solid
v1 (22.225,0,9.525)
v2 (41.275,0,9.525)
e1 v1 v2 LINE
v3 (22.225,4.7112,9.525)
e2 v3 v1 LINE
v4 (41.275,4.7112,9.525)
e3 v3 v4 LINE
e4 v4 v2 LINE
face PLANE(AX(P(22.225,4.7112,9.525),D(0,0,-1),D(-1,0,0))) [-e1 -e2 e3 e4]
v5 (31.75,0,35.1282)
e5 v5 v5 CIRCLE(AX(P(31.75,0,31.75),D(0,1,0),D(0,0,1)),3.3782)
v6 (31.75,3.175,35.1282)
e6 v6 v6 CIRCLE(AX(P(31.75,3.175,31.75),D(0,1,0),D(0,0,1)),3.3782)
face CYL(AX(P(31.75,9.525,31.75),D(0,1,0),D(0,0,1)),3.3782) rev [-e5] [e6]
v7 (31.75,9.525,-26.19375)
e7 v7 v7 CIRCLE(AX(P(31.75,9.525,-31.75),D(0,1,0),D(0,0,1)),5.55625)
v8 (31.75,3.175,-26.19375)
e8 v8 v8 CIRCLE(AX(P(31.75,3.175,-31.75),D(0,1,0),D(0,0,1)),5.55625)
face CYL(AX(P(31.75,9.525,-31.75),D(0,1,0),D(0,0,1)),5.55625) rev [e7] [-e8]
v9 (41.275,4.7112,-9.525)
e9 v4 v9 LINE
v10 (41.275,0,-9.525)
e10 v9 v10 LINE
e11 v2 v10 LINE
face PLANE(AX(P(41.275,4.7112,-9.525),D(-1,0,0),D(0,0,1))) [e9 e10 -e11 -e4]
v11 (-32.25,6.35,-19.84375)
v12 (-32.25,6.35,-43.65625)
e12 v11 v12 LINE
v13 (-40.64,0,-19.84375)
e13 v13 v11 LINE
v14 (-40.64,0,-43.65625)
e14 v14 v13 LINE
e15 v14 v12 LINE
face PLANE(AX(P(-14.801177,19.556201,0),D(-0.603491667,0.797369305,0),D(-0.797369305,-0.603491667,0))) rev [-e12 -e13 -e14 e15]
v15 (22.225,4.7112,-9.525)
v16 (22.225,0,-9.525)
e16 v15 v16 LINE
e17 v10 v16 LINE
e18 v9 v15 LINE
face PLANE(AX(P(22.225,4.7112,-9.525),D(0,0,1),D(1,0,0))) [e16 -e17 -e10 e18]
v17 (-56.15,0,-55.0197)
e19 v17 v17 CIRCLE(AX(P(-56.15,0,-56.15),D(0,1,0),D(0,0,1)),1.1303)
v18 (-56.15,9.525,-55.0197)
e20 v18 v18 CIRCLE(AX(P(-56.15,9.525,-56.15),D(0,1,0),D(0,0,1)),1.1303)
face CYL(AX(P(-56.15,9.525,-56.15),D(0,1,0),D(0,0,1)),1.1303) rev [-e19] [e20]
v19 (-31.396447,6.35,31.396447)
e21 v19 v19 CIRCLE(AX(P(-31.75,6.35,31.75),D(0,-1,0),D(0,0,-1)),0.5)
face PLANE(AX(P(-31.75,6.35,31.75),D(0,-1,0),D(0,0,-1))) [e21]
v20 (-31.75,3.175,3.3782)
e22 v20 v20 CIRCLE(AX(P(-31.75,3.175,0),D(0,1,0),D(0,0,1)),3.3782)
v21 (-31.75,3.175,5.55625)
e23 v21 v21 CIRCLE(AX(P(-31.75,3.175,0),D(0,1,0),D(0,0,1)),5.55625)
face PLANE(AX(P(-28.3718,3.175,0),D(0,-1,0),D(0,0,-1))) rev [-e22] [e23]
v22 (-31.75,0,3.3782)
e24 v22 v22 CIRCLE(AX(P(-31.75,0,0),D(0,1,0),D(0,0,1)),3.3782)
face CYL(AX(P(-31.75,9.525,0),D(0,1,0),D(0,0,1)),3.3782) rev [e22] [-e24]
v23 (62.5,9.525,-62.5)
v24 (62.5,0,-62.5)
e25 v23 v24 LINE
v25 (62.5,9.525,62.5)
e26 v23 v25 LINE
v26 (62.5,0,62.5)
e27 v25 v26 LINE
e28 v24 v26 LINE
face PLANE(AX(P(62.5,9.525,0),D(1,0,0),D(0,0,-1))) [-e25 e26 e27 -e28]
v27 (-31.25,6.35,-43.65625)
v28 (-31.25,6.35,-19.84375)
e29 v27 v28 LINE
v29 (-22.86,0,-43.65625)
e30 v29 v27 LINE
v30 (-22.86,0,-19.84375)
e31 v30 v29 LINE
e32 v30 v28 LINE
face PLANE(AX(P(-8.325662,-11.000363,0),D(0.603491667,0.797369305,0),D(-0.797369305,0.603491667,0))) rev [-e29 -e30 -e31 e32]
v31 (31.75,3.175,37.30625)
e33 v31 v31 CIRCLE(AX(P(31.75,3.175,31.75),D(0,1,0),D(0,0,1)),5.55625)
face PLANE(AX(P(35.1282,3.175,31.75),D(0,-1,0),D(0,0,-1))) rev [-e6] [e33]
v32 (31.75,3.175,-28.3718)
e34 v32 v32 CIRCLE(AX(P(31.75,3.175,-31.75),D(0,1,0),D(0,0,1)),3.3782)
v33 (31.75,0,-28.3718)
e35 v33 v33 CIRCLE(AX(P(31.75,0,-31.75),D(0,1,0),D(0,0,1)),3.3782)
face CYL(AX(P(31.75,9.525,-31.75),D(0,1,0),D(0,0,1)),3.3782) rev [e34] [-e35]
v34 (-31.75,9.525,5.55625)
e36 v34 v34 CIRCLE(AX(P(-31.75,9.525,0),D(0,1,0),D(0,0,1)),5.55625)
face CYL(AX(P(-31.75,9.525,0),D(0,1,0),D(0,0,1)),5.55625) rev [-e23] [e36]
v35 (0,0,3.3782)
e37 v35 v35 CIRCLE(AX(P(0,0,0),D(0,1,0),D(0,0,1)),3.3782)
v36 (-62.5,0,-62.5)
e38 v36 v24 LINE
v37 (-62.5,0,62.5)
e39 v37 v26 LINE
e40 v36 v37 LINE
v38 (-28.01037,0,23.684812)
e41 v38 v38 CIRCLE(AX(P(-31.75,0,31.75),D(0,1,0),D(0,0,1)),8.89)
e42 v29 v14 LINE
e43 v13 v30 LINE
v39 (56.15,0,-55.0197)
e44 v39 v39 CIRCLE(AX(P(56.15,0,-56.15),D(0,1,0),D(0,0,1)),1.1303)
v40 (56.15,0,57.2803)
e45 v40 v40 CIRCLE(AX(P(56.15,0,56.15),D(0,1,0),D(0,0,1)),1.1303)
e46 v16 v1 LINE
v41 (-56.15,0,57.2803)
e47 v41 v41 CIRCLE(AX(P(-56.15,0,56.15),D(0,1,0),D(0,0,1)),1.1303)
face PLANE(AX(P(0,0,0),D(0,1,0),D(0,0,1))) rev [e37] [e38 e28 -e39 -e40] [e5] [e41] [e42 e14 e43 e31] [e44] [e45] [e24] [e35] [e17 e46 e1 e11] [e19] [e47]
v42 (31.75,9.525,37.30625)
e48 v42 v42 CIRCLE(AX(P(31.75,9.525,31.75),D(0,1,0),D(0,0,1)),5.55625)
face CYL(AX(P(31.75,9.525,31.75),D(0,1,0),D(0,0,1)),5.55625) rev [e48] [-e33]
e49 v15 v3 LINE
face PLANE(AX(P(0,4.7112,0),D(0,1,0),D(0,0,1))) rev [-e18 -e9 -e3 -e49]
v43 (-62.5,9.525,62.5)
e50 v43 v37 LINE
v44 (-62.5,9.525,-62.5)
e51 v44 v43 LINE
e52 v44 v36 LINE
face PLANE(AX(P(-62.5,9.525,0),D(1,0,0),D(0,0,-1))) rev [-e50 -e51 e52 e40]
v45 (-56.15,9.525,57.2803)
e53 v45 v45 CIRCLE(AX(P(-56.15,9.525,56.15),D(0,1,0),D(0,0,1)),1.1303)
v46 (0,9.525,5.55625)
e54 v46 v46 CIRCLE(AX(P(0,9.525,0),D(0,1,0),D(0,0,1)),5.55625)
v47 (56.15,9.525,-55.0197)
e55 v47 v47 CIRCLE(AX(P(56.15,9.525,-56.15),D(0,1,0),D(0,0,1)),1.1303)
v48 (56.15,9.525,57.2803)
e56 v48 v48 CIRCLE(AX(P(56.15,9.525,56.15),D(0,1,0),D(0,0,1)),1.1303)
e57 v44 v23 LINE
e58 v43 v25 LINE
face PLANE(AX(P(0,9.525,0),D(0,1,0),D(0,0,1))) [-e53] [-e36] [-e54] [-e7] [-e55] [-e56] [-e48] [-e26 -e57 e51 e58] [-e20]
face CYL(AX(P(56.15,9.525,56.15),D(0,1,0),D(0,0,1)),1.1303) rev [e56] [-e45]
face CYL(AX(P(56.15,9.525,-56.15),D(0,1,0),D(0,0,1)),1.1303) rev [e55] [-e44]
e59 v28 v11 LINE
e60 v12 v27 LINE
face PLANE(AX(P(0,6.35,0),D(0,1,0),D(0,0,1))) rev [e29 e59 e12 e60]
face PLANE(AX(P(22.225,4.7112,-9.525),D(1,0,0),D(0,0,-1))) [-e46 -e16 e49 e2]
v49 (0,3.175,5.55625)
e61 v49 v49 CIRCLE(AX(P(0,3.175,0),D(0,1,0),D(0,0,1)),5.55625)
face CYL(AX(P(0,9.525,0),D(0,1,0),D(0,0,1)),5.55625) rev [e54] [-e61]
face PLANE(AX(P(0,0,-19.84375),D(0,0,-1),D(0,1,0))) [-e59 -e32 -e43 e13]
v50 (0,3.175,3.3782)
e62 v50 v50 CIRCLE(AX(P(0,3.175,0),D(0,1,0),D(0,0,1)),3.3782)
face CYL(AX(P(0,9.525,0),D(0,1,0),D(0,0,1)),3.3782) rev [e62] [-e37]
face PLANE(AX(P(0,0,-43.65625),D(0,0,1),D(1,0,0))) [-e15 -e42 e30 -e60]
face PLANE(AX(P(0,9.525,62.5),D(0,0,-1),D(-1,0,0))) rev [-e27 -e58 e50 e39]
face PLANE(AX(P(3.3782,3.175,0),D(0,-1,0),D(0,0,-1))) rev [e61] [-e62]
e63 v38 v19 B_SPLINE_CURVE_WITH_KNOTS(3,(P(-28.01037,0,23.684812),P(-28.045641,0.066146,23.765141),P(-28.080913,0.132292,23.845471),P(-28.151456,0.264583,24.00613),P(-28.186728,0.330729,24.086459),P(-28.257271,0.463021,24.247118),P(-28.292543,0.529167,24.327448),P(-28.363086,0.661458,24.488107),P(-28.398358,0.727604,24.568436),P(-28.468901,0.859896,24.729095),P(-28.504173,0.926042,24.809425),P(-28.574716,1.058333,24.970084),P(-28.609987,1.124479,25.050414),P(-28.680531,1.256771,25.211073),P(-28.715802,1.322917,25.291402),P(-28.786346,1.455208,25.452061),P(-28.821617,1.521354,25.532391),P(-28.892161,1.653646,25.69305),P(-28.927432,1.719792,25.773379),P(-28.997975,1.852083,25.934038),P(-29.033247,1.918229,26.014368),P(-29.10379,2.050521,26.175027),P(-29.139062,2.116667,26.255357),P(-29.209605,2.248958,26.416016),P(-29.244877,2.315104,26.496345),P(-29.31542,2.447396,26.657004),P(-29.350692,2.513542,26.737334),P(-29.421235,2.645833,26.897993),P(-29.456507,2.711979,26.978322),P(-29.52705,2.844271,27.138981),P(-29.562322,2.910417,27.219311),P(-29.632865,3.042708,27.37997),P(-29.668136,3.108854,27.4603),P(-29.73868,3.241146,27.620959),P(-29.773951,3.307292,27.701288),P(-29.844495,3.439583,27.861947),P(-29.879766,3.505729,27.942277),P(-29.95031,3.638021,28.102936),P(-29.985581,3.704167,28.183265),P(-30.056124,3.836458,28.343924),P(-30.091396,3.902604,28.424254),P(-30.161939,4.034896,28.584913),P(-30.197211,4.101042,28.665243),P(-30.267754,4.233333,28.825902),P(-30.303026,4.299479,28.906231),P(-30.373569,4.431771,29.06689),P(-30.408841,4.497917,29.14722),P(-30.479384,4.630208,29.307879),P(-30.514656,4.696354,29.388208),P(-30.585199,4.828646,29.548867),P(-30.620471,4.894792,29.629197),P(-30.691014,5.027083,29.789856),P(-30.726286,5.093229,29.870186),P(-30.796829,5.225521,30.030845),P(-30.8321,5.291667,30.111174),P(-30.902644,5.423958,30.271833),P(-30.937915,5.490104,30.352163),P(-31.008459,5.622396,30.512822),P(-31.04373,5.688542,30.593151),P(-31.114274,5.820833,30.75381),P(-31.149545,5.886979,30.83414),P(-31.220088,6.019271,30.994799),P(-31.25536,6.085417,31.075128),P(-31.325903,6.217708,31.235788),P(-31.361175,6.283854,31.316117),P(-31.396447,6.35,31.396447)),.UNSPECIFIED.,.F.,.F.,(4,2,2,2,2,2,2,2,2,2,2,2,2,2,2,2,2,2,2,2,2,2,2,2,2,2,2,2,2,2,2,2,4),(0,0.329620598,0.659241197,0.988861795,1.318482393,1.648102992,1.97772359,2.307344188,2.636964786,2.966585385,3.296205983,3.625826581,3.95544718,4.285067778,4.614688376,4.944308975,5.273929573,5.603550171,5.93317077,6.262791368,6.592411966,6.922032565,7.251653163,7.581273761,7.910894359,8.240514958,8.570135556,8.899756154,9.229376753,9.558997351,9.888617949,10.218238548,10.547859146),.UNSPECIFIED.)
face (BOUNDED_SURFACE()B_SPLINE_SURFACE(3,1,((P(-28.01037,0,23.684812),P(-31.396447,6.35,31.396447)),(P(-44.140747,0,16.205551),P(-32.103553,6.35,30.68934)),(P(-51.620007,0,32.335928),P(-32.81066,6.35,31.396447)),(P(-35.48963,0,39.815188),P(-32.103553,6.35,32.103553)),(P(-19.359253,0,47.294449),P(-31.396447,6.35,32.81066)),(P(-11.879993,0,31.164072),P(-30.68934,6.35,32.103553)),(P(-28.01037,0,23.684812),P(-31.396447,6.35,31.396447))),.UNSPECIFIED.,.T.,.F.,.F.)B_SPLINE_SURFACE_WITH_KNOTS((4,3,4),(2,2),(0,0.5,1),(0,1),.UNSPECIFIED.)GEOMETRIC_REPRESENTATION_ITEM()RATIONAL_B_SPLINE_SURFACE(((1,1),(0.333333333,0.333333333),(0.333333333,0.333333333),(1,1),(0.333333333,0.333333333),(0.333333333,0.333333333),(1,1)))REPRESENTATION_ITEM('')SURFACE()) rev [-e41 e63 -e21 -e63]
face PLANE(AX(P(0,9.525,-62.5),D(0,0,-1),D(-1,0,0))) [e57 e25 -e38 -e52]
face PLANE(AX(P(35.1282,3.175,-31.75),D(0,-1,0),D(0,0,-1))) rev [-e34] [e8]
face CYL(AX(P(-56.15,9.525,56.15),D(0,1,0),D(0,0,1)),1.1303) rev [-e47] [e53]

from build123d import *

# Parameters (mm, degrees)
PLATES_DIMS_W                                    = 125
PLATES_DIMS_H                                    = 125
PLATE_THICKNESS_DEPTH                            = 9.525
F_4_40_TAPPED_HOLE1_D                            = 2.2606
LPATTERN1_COUNT                                  = 2
LPATTERN1_PITCH                                  = 112.3
LPATTERN1_COUNT_DIR2                             = 2
LPATTERN1_PITCH_DIR2                             = 112.3
FLAT_DIMS_W                                      = 19.05
FLAT_DIMS_H                                      = 19.05
FLAT_CUT_LENGTH_DEPTH                            = 4.7112
CBORE_FOR_1_4_SOCKET_HEAD_CAP_SCREW1_D           = 6.7564
CBORE_FOR_1_4_SOCKET_HEAD_CAP_SCREW1_CBORE_D     = 11.1125
CBORE_FOR_1_4_SOCKET_HEAD_CAP_SCREW1_CBORE_DEPTH = 6.35


with BuildPart() as part:
    # Plates_Dims → Plate_Thickness (new body)
    with BuildSketch(Plane(origin=(0, 0, 0), x_dir=(1, 0, 0), z_dir=(0, 1, 0))):
        Rectangle(PLATES_DIMS_W, PLATES_DIMS_H)
    extrude(amount=PLATE_THICKNESS_DEPTH)

    # #4-40 Tapped Hole1 (through all)
    with Locations(Plane(origin=(56.15, 9.525, 56.15), x_dir=(0, 0, 1), z_dir=(0, 1, 0))):
        with Locations((0, 0)):
            f_4_40_tapped_hole1 = Hole(F_4_40_TAPPED_HOLE1_D / 2)

    # LPattern1: 4-40 Tapped Hole1 2 × 2
    with Locations(*[(-j * LPATTERN1_PITCH_DIR2, 0, -i * LPATTERN1_PITCH) for i in range(LPATTERN1_COUNT) for j in range(LPATTERN1_COUNT_DIR2) if (i, j) != (0, 0)]):
        add(f_4_40_tapped_hole1, mode=Mode.SUBTRACT)

    # Cone_Cut: read off the stored shape, not the designer's step
    # Cone_Cut: loft between two sections, ruled curve by curve
    cone_cut_from = [
        Edge.make_bspline([(-28.010369629, 0, 23.684811553), (-44.140746524, 0, 16.205550811), (-51.620007265, 0, 32.335927706), (-35.489630371, 0, 39.815188447), (-19.359253476, 0, 47.294449189), (-11.879992735, 0, 31.164072294), (-28.010369629, 0, 23.684811553)], [0, 0, 0, 0, 0.5, 0.5, 0.5, 1, 1, 1, 1], 3, [1, 0.333333333, 0.333333333, 1, 0.333333333, 0.333333333, 1]),
    ]
    cone_cut_to = [
        Edge.make_bspline([(-31.396446609, 6.35, 31.396446609), (-32.103553391, 6.35, 30.689339828), (-32.810660172, 6.35, 31.396446609), (-32.103553391, 6.35, 32.103553391), (-31.396446609, 6.35, 32.810660172), (-30.689339828, 6.35, 32.103553391), (-31.396446609, 6.35, 31.396446609)], [0, 0, 0, 0, 0.5, 0.5, 0.5, 1, 1, 1, 1], 3, [1, 0.333333333, 0.333333333, 1, 0.333333333, 0.333333333, 1]),
    ]
    cone_cut = Solid(Shell([*[Face.make_surface_from_curves(cone_cut_from[k], cone_cut_to[k]) for k in range(1)], Face(Wire(cone_cut_from)), Face(Wire(cone_cut_to))]))
    add(cone_cut, mode=Mode.SUBTRACT)

    # Bottom_Groove → Groove_Cut section 0
    with BuildSketch(Plane(origin=(0, 0, 0), x_dir=(1, 0, 0), z_dir=(0, 1, 0))):
        with BuildLine():
            Line((-40.64, 43.65625), (-22.86, 43.65625))
            Line((-22.86, 43.65625), (-22.86, 19.84375))
            Line((-22.86, 19.84375), (-40.64, 19.84375))
            Line((-40.64, 19.84375), (-40.64, 43.65625))
        make_face()
    # Top_Groove → Groove_Cut section 1
    with BuildSketch(Plane(origin=(0, 6.35, 0), x_dir=(-1, 0, 0), z_dir=(0, -1, 0))):
        with BuildLine():
            Line((32.25, 43.65625), (31.25, 43.65625))
            Line((31.25, 43.65625), (31.25, 19.84375))
            Line((31.25, 19.84375), (32.25, 19.84375))
            Line((32.25, 19.84375), (32.25, 43.65625))
        make_face()
    loft(mode=Mode.SUBTRACT)

    # Flat_Dims → Flat_Cut_Length (cut)
    with BuildSketch(Plane(origin=(0, 0, 0), x_dir=(1, 0, 0), z_dir=(0, 1, 0))):
        with Locations((31.75, 0)):
            Rectangle(FLAT_DIMS_W, FLAT_DIMS_H)
    extrude(amount=FLAT_CUT_LENGTH_DEPTH, mode=Mode.SUBTRACT)

    # CBORE for 1/4 Socket Head Cap Screw1 (through all)
    with Locations(Plane(origin=(-31.75, 9.525, 0), x_dir=(0, 0, 1), z_dir=(0, 1, 0))):
        with Locations((0, 0), (31.75, 63.5), (-31.75, 63.5), (0, 31.75)):
            CounterBoreHole(CBORE_FOR_1_4_SOCKET_HEAD_CAP_SCREW1_D / 2, CBORE_FOR_1_4_SOCKET_HEAD_CAP_SCREW1_CBORE_D / 2, CBORE_FOR_1_4_SOCKET_HEAD_CAP_SCREW1_CBORE_DEPTH)


solid = part.part
